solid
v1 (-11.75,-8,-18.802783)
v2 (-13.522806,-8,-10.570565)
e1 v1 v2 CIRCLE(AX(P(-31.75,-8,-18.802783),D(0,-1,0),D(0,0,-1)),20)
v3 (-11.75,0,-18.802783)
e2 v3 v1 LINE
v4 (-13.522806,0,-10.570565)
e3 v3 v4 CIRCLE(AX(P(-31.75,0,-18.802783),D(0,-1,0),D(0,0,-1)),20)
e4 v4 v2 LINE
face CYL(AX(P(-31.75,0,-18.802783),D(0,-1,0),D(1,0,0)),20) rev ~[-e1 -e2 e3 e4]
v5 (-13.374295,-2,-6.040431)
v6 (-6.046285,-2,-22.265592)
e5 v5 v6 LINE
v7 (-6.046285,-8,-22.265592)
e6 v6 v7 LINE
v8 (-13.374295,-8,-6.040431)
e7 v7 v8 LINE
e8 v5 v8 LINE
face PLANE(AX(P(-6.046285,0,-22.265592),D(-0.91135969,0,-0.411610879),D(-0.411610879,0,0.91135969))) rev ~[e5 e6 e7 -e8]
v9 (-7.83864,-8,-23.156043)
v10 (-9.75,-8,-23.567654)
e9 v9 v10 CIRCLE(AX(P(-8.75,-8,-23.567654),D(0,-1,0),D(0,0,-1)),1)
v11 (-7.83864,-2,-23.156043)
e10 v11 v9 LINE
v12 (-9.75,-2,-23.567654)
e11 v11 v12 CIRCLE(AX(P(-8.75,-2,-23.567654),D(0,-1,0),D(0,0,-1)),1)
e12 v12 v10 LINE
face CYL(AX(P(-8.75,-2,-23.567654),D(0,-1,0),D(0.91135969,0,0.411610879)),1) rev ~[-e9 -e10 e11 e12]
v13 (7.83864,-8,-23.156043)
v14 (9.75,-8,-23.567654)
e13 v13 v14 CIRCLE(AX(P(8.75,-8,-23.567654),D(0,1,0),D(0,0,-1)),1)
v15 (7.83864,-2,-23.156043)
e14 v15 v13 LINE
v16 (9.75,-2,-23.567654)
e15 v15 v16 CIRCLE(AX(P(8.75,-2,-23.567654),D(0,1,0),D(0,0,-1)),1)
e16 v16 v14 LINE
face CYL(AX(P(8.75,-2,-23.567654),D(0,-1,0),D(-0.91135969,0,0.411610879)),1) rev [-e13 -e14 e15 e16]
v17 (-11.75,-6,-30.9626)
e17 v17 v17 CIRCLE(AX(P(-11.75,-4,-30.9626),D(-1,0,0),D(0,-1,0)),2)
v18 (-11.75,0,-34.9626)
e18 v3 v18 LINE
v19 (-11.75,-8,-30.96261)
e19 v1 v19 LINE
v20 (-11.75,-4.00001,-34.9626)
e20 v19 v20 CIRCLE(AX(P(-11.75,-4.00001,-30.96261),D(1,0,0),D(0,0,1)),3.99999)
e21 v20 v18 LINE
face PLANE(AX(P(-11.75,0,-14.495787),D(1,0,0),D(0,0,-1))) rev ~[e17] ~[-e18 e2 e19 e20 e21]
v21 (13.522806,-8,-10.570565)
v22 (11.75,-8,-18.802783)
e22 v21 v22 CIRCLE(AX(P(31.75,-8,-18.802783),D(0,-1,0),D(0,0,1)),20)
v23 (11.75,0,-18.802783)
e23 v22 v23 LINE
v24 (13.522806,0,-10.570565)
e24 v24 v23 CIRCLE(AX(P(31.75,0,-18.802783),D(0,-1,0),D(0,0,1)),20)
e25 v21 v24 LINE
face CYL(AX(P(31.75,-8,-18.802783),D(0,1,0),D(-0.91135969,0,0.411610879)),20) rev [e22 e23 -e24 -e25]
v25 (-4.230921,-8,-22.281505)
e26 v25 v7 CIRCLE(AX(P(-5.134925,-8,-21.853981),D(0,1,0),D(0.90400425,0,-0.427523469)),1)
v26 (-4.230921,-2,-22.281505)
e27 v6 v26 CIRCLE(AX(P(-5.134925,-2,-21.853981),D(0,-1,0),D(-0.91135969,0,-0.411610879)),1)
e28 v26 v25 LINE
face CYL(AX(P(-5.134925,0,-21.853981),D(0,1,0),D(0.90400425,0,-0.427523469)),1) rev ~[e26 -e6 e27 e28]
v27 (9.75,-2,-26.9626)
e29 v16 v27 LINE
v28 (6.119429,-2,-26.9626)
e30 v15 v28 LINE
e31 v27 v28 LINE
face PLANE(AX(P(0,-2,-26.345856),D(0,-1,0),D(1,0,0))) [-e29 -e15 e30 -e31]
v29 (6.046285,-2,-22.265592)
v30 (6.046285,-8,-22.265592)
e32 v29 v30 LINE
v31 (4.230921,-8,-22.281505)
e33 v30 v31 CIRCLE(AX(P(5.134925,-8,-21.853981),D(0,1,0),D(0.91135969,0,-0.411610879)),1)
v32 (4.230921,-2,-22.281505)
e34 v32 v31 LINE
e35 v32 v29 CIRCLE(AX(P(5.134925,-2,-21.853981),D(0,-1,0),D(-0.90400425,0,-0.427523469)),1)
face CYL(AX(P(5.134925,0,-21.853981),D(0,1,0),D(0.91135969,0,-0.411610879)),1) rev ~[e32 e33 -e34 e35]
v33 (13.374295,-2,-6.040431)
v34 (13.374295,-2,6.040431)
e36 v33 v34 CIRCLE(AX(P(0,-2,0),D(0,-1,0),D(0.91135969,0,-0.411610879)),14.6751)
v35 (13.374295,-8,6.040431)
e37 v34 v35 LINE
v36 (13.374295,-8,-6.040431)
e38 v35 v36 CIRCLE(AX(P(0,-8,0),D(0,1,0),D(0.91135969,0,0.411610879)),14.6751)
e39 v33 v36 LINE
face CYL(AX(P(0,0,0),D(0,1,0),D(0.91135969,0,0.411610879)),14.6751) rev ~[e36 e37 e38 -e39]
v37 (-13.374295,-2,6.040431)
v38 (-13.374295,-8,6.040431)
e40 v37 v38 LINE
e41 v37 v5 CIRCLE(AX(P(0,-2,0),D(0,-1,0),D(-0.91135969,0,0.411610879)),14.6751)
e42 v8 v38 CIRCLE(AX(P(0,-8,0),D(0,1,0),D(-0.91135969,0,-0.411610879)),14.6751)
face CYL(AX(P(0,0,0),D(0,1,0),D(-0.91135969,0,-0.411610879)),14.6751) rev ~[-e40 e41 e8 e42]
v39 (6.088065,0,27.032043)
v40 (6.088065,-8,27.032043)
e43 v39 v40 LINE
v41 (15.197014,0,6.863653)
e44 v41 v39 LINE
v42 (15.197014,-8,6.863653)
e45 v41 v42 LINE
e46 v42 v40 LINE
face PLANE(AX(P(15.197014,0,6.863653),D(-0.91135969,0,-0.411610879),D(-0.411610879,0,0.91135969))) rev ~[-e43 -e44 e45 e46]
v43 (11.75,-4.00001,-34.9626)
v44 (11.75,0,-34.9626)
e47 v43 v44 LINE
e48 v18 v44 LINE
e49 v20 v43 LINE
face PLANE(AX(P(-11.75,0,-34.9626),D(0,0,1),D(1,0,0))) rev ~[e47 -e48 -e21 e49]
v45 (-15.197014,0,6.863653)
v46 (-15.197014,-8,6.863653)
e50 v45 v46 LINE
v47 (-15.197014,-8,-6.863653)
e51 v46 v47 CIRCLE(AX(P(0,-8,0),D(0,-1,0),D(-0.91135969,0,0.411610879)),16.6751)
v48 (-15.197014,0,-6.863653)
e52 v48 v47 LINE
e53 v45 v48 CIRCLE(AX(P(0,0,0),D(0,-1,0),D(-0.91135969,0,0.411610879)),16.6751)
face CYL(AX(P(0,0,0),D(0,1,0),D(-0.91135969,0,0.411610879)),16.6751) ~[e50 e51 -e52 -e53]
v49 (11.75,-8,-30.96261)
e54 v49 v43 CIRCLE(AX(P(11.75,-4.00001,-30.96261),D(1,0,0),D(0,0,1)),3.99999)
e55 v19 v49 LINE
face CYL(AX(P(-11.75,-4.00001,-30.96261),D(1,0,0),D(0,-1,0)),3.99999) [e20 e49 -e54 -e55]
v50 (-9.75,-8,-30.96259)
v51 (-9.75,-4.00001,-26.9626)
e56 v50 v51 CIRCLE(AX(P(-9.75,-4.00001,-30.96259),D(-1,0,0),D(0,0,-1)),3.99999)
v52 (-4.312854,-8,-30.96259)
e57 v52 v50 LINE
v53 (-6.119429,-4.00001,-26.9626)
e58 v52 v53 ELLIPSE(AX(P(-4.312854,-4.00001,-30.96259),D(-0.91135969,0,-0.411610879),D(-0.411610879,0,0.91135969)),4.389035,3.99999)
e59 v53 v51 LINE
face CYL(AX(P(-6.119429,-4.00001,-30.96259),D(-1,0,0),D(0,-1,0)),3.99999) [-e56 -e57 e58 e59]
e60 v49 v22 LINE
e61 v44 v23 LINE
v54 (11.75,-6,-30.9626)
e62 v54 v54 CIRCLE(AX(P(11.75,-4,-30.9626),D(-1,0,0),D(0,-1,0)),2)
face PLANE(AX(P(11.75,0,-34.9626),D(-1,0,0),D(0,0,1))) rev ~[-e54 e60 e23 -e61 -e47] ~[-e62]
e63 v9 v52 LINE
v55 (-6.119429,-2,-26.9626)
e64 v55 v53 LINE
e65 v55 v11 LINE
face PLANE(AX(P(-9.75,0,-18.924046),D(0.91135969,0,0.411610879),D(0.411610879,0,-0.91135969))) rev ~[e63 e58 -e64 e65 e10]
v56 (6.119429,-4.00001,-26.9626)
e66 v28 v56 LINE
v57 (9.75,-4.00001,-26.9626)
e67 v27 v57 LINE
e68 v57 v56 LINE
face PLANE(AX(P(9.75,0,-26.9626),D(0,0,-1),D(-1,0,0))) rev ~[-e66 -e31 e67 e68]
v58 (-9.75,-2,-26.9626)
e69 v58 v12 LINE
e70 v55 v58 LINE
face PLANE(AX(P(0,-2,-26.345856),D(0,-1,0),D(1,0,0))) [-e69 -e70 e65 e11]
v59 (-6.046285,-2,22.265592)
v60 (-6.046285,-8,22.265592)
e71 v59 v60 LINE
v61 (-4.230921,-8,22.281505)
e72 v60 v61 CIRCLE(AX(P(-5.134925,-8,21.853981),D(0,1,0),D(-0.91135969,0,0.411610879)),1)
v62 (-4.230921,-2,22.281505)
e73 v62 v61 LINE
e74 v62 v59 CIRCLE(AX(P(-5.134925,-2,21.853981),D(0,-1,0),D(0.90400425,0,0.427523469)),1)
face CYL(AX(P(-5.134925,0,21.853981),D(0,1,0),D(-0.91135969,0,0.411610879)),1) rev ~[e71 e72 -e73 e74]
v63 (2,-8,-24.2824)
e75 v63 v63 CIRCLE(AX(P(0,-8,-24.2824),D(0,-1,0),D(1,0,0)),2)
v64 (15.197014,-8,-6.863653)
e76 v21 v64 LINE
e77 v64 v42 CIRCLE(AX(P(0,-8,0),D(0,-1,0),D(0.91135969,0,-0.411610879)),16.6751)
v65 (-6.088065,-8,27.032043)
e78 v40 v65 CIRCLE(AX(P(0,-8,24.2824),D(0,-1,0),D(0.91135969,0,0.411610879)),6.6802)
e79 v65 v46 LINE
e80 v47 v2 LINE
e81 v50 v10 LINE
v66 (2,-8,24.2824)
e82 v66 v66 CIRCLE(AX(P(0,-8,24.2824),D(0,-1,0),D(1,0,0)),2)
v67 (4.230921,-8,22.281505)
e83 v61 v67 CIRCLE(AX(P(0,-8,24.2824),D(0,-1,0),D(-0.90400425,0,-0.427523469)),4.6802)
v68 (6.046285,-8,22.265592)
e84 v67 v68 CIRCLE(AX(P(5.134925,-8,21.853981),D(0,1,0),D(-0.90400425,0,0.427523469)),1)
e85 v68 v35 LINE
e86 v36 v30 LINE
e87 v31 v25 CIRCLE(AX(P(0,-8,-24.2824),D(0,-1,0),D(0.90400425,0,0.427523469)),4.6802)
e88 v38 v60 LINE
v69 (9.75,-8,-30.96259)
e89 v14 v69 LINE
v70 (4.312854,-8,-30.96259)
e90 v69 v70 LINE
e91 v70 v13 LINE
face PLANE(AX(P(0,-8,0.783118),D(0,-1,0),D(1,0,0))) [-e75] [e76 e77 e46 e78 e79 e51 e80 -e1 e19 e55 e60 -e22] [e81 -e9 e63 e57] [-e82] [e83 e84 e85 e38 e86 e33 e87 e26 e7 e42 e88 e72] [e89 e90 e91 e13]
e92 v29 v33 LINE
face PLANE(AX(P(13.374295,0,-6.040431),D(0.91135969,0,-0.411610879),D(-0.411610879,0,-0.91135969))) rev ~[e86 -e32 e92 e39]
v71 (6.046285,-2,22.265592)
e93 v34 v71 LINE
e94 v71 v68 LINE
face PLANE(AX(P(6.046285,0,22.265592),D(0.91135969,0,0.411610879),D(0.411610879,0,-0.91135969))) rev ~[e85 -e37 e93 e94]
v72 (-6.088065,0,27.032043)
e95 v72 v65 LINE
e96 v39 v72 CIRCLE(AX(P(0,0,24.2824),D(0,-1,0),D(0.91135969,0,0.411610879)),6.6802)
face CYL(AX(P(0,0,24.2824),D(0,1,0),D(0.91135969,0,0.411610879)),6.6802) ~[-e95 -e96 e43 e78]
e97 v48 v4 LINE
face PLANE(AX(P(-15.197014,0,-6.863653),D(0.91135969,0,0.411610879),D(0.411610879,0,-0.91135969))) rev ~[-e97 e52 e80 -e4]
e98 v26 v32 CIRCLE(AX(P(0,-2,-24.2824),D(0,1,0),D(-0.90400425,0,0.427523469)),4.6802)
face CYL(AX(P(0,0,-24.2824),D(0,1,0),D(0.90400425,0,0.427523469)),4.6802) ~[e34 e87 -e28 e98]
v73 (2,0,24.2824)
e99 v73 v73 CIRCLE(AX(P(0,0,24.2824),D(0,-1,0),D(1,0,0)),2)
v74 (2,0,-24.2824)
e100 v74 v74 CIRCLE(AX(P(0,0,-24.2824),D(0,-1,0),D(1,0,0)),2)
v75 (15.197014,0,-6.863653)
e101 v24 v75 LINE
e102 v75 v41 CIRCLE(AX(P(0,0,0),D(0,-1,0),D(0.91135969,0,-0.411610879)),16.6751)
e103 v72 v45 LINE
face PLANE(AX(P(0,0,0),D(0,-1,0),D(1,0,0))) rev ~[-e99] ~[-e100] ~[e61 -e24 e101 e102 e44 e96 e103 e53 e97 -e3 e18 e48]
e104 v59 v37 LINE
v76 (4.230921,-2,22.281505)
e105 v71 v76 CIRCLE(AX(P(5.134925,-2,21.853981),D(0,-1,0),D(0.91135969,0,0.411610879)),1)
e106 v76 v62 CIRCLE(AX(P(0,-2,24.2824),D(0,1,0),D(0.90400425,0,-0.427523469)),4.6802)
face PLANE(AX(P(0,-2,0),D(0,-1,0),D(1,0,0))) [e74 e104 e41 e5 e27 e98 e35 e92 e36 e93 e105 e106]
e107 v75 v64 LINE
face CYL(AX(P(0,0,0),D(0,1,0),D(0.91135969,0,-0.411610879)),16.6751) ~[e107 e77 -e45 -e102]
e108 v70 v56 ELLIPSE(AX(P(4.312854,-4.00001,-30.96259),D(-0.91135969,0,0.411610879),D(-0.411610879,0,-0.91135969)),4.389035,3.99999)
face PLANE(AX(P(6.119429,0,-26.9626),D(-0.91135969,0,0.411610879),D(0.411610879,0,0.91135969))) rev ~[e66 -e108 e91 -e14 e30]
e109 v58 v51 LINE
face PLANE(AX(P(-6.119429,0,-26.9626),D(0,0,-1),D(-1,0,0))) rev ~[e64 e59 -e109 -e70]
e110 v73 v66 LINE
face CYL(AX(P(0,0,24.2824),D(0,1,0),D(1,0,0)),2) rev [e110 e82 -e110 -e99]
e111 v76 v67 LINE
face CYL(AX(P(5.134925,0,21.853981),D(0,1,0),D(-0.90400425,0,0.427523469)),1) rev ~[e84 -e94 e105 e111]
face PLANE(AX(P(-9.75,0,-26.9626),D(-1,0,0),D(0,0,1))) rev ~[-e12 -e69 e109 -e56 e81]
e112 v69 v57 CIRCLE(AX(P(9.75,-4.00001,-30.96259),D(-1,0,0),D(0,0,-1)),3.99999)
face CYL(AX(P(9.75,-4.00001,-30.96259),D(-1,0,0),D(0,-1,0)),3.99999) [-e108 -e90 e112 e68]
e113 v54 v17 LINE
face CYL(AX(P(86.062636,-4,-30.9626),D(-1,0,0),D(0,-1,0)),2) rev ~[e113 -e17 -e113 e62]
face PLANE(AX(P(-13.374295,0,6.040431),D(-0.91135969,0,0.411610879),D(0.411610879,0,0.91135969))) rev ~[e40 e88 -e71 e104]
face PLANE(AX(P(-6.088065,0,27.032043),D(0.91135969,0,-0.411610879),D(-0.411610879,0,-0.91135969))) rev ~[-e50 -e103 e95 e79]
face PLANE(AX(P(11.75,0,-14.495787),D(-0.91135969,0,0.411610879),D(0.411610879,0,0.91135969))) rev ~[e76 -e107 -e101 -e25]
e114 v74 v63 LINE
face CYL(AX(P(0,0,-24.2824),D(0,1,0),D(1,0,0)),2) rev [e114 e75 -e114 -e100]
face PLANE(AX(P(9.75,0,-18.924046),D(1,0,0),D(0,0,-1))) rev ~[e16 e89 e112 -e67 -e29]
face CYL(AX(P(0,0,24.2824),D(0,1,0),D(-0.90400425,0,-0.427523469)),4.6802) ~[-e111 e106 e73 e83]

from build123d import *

# Parameters (mm, degrees)
F0_R     = 2
F1_DEPTH = 8
F2_DEPTH = 2
F3_R     = 20
F4_R     = 1
F6_D     = 4
F7_R     = 3.99999


# Not quite as in the source:
# - a fillet or chamfer is up to 0.001 mm smaller than in the source, because OpenCascade refuses the exact size
# - a feature names something its author has since deleted; it is built from what else it names


with BuildPart() as f1:
    # F0 (on Front) → F1 (new body)
    with BuildSketch(Plane.XZ):
        with BuildLine():
            Line((15.1970139668, 6.8636525628), (6.0880650012, 27.0320429916))
            ThreePointArc((6.0880650012, 27.0320429916), (0, 30.9626), (-6.0880650012, 27.0320429916))
            Line((-6.0880650012, 27.0320429916), (-15.1970139668, 6.8636525628))
            ThreePointArc((-15.1970139668, 6.8636525628), (-16.6751, 0), (-15.1970139668, -6.8636525628))
            Line((-15.1970139668, -6.8636525628), (-11.75, -14.4957870449))
            Line((-11.75, -14.4957870449), (-9.75, -18.9240455641))
            Line((-9.75, -18.9240455641), (-6.1194285683, -26.9626))
            Line((-6.1194285683, -26.9626), (6.1194285683, -26.9626))
            Line((6.1194285683, -26.9626), (9.75, -18.9240455641))
            Line((9.75, -18.9240455641), (11.75, -14.4957870449))
            Line((11.75, -14.4957870449), (15.1970139668, -6.8636525628))
            ThreePointArc((15.1970139668, -6.8636525628), (16.6751, 0), (15.1970139668, 6.8636525628))
        make_face()
        with Locations((0, -24.2824)):
            Circle(F0_R, mode=Mode.SUBTRACT)
        with BuildLine():
            Line((-13.3742945868, 6.0404308054), (-6.0462846285, 22.2655920687))
            ThreePointArc((-6.0462846285, 22.2655920687), (-5.1436901116, 22.8539427752), (-4.2309206889, 22.2815046593))
            ThreePointArc((-4.2309206889, 22.2815046593), (0, 19.6022), (4.2309206889, 22.2815046593))
            ThreePointArc((4.2309206889, 22.2815046593), (5.1436901116, 22.8539427752), (6.0462846285, 22.2655920687))
            Line((6.0462846285, 22.2655920687), (13.3742945868, 6.0404308054))
            ThreePointArc((13.3742945868, 6.0404308054), (14.6751, 0), (13.3742945868, -6.0404308054))
            Line((13.3742945868, -6.0404308054), (6.0462846285, -22.2655920687))
            ThreePointArc((6.0462846285, -22.2655920687), (5.1436901116, -22.8539427752), (4.2309206889, -22.2815046593))
            ThreePointArc((4.2309206889, -22.2815046593), (0, -19.6022), (-4.2309206889, -22.2815046593))
            ThreePointArc((-4.2309206889, -22.2815046593), (-5.1436901116, -22.8539427752), (-6.0462846285, -22.2655920687))
            Line((-6.0462846285, -22.2655920687), (-13.3742945868, -6.0404308054))
            ThreePointArc((-13.3742945868, -6.0404308054), (-14.6751, 0), (-13.3742945868, 6.0404308054))
        make_face(mode=Mode.SUBTRACT)
        with Locations((0, 24.2824)):
            Circle(F0_R, mode=Mode.SUBTRACT)
        Polygon((11.75, -34.9626), (11.75, -14.4957870449), (9.75, -18.9240455641), (9.75, -26.9626), (6.1194285683, -26.9626), (-6.1194285683, -26.9626), (-9.75, -26.9626), (-9.75, -18.9240455641), (-11.75, -14.4957870449), (-11.75, -34.9626), align=None)
    extrude(amount=F1_DEPTH)

    # F0 (on Front) → F2 (join)
    with BuildSketch(Plane.XZ):
        with BuildLine():
            ThreePointArc((-4.2309206889, 22.2815046593), (-5.1436901116, 22.8539427752), (-6.0462846285, 22.2655920687))
            Line((-6.0462846285, 22.2655920687), (-13.3742945868, 6.0404308054))
            ThreePointArc((-13.3742945868, 6.0404308054), (-14.6751, 0), (-13.3742945868, -6.0404308054))
            Line((-13.3742945868, -6.0404308054), (-6.0462846285, -22.2655920687))
            ThreePointArc((-6.0462846285, -22.2655920687), (-5.1436901116, -22.8539427752), (-4.2309206889, -22.2815046593))
            ThreePointArc((-4.2309206889, -22.2815046593), (0, -19.6022), (4.2309206889, -22.2815046593))
            ThreePointArc((4.2309206889, -22.2815046593), (5.1436901116, -22.8539427752), (6.0462846285, -22.2655920687))
            Line((6.0462846285, -22.2655920687), (13.3742945868, -6.0404308054))
            ThreePointArc((13.3742945868, -6.0404308054), (14.6751, 0), (13.3742945868, 6.0404308054))
            Line((13.3742945868, 6.0404308054), (6.0462846285, 22.2655920687))
            ThreePointArc((6.0462846285, 22.2655920687), (5.1436901116, 22.8539427752), (4.2309206889, 22.2815046593))
            ThreePointArc((4.2309206889, 22.2815046593), (0, 19.6022), (-4.2309206889, 22.2815046593))
        make_face()
        Polygon((11.75, -34.9626), (11.75, -14.4957870449), (9.75, -18.9240455641), (9.75, -26.9626), (6.1194285683, -26.9626), (-6.1194285683, -26.9626), (-9.75, -26.9626), (-9.75, -18.9240455641), (-11.75, -14.4957870449), (-11.75, -34.9626), align=None)
        Polygon((-6.1194285683, -26.9626), (-9.75, -18.9240455641), (-9.75, -26.9626), align=None)
        Polygon((9.75, -26.9626), (9.75, -18.9240455641), (6.1194285683, -26.9626), align=None)
    extrude(amount=F2_DEPTH)

    # F3
    f3_edges = [f1.edges().sort_by_distance(p)[0] for p in [
        (11.75, -4, -14.495787),
        (-11.75, -4, -14.495787),
    ]]
    fillet(f3_edges, radius=F3_R)

    # F4
    f4_edges = [f1.edges().sort_by_distance(p)[0] for p in [
        (9.75, -5, -18.924046),
        (-9.75, -5, -18.924046),
    ]]
    fillet(f4_edges, radius=F4_R)

    # F6 (through all)
    with Locations(Plane.YZ.offset(11.75)):
        with Locations((-4, -30.9626)):
            Hole(F6_D / 2)

    # F7 (radius 4 in the source; OpenCascade refuses exactly that, so slightly less here)
    f7_edges = [f1.edges().sort_by_distance(p)[0] for p in [
        (0, -8, -34.9626),
        (7.934714, -8, -26.9626),
        (-7.934714, -8, -26.9626),
    ]]
    fillet(f7_edges, radius=F7_R)


solid = f1.part
